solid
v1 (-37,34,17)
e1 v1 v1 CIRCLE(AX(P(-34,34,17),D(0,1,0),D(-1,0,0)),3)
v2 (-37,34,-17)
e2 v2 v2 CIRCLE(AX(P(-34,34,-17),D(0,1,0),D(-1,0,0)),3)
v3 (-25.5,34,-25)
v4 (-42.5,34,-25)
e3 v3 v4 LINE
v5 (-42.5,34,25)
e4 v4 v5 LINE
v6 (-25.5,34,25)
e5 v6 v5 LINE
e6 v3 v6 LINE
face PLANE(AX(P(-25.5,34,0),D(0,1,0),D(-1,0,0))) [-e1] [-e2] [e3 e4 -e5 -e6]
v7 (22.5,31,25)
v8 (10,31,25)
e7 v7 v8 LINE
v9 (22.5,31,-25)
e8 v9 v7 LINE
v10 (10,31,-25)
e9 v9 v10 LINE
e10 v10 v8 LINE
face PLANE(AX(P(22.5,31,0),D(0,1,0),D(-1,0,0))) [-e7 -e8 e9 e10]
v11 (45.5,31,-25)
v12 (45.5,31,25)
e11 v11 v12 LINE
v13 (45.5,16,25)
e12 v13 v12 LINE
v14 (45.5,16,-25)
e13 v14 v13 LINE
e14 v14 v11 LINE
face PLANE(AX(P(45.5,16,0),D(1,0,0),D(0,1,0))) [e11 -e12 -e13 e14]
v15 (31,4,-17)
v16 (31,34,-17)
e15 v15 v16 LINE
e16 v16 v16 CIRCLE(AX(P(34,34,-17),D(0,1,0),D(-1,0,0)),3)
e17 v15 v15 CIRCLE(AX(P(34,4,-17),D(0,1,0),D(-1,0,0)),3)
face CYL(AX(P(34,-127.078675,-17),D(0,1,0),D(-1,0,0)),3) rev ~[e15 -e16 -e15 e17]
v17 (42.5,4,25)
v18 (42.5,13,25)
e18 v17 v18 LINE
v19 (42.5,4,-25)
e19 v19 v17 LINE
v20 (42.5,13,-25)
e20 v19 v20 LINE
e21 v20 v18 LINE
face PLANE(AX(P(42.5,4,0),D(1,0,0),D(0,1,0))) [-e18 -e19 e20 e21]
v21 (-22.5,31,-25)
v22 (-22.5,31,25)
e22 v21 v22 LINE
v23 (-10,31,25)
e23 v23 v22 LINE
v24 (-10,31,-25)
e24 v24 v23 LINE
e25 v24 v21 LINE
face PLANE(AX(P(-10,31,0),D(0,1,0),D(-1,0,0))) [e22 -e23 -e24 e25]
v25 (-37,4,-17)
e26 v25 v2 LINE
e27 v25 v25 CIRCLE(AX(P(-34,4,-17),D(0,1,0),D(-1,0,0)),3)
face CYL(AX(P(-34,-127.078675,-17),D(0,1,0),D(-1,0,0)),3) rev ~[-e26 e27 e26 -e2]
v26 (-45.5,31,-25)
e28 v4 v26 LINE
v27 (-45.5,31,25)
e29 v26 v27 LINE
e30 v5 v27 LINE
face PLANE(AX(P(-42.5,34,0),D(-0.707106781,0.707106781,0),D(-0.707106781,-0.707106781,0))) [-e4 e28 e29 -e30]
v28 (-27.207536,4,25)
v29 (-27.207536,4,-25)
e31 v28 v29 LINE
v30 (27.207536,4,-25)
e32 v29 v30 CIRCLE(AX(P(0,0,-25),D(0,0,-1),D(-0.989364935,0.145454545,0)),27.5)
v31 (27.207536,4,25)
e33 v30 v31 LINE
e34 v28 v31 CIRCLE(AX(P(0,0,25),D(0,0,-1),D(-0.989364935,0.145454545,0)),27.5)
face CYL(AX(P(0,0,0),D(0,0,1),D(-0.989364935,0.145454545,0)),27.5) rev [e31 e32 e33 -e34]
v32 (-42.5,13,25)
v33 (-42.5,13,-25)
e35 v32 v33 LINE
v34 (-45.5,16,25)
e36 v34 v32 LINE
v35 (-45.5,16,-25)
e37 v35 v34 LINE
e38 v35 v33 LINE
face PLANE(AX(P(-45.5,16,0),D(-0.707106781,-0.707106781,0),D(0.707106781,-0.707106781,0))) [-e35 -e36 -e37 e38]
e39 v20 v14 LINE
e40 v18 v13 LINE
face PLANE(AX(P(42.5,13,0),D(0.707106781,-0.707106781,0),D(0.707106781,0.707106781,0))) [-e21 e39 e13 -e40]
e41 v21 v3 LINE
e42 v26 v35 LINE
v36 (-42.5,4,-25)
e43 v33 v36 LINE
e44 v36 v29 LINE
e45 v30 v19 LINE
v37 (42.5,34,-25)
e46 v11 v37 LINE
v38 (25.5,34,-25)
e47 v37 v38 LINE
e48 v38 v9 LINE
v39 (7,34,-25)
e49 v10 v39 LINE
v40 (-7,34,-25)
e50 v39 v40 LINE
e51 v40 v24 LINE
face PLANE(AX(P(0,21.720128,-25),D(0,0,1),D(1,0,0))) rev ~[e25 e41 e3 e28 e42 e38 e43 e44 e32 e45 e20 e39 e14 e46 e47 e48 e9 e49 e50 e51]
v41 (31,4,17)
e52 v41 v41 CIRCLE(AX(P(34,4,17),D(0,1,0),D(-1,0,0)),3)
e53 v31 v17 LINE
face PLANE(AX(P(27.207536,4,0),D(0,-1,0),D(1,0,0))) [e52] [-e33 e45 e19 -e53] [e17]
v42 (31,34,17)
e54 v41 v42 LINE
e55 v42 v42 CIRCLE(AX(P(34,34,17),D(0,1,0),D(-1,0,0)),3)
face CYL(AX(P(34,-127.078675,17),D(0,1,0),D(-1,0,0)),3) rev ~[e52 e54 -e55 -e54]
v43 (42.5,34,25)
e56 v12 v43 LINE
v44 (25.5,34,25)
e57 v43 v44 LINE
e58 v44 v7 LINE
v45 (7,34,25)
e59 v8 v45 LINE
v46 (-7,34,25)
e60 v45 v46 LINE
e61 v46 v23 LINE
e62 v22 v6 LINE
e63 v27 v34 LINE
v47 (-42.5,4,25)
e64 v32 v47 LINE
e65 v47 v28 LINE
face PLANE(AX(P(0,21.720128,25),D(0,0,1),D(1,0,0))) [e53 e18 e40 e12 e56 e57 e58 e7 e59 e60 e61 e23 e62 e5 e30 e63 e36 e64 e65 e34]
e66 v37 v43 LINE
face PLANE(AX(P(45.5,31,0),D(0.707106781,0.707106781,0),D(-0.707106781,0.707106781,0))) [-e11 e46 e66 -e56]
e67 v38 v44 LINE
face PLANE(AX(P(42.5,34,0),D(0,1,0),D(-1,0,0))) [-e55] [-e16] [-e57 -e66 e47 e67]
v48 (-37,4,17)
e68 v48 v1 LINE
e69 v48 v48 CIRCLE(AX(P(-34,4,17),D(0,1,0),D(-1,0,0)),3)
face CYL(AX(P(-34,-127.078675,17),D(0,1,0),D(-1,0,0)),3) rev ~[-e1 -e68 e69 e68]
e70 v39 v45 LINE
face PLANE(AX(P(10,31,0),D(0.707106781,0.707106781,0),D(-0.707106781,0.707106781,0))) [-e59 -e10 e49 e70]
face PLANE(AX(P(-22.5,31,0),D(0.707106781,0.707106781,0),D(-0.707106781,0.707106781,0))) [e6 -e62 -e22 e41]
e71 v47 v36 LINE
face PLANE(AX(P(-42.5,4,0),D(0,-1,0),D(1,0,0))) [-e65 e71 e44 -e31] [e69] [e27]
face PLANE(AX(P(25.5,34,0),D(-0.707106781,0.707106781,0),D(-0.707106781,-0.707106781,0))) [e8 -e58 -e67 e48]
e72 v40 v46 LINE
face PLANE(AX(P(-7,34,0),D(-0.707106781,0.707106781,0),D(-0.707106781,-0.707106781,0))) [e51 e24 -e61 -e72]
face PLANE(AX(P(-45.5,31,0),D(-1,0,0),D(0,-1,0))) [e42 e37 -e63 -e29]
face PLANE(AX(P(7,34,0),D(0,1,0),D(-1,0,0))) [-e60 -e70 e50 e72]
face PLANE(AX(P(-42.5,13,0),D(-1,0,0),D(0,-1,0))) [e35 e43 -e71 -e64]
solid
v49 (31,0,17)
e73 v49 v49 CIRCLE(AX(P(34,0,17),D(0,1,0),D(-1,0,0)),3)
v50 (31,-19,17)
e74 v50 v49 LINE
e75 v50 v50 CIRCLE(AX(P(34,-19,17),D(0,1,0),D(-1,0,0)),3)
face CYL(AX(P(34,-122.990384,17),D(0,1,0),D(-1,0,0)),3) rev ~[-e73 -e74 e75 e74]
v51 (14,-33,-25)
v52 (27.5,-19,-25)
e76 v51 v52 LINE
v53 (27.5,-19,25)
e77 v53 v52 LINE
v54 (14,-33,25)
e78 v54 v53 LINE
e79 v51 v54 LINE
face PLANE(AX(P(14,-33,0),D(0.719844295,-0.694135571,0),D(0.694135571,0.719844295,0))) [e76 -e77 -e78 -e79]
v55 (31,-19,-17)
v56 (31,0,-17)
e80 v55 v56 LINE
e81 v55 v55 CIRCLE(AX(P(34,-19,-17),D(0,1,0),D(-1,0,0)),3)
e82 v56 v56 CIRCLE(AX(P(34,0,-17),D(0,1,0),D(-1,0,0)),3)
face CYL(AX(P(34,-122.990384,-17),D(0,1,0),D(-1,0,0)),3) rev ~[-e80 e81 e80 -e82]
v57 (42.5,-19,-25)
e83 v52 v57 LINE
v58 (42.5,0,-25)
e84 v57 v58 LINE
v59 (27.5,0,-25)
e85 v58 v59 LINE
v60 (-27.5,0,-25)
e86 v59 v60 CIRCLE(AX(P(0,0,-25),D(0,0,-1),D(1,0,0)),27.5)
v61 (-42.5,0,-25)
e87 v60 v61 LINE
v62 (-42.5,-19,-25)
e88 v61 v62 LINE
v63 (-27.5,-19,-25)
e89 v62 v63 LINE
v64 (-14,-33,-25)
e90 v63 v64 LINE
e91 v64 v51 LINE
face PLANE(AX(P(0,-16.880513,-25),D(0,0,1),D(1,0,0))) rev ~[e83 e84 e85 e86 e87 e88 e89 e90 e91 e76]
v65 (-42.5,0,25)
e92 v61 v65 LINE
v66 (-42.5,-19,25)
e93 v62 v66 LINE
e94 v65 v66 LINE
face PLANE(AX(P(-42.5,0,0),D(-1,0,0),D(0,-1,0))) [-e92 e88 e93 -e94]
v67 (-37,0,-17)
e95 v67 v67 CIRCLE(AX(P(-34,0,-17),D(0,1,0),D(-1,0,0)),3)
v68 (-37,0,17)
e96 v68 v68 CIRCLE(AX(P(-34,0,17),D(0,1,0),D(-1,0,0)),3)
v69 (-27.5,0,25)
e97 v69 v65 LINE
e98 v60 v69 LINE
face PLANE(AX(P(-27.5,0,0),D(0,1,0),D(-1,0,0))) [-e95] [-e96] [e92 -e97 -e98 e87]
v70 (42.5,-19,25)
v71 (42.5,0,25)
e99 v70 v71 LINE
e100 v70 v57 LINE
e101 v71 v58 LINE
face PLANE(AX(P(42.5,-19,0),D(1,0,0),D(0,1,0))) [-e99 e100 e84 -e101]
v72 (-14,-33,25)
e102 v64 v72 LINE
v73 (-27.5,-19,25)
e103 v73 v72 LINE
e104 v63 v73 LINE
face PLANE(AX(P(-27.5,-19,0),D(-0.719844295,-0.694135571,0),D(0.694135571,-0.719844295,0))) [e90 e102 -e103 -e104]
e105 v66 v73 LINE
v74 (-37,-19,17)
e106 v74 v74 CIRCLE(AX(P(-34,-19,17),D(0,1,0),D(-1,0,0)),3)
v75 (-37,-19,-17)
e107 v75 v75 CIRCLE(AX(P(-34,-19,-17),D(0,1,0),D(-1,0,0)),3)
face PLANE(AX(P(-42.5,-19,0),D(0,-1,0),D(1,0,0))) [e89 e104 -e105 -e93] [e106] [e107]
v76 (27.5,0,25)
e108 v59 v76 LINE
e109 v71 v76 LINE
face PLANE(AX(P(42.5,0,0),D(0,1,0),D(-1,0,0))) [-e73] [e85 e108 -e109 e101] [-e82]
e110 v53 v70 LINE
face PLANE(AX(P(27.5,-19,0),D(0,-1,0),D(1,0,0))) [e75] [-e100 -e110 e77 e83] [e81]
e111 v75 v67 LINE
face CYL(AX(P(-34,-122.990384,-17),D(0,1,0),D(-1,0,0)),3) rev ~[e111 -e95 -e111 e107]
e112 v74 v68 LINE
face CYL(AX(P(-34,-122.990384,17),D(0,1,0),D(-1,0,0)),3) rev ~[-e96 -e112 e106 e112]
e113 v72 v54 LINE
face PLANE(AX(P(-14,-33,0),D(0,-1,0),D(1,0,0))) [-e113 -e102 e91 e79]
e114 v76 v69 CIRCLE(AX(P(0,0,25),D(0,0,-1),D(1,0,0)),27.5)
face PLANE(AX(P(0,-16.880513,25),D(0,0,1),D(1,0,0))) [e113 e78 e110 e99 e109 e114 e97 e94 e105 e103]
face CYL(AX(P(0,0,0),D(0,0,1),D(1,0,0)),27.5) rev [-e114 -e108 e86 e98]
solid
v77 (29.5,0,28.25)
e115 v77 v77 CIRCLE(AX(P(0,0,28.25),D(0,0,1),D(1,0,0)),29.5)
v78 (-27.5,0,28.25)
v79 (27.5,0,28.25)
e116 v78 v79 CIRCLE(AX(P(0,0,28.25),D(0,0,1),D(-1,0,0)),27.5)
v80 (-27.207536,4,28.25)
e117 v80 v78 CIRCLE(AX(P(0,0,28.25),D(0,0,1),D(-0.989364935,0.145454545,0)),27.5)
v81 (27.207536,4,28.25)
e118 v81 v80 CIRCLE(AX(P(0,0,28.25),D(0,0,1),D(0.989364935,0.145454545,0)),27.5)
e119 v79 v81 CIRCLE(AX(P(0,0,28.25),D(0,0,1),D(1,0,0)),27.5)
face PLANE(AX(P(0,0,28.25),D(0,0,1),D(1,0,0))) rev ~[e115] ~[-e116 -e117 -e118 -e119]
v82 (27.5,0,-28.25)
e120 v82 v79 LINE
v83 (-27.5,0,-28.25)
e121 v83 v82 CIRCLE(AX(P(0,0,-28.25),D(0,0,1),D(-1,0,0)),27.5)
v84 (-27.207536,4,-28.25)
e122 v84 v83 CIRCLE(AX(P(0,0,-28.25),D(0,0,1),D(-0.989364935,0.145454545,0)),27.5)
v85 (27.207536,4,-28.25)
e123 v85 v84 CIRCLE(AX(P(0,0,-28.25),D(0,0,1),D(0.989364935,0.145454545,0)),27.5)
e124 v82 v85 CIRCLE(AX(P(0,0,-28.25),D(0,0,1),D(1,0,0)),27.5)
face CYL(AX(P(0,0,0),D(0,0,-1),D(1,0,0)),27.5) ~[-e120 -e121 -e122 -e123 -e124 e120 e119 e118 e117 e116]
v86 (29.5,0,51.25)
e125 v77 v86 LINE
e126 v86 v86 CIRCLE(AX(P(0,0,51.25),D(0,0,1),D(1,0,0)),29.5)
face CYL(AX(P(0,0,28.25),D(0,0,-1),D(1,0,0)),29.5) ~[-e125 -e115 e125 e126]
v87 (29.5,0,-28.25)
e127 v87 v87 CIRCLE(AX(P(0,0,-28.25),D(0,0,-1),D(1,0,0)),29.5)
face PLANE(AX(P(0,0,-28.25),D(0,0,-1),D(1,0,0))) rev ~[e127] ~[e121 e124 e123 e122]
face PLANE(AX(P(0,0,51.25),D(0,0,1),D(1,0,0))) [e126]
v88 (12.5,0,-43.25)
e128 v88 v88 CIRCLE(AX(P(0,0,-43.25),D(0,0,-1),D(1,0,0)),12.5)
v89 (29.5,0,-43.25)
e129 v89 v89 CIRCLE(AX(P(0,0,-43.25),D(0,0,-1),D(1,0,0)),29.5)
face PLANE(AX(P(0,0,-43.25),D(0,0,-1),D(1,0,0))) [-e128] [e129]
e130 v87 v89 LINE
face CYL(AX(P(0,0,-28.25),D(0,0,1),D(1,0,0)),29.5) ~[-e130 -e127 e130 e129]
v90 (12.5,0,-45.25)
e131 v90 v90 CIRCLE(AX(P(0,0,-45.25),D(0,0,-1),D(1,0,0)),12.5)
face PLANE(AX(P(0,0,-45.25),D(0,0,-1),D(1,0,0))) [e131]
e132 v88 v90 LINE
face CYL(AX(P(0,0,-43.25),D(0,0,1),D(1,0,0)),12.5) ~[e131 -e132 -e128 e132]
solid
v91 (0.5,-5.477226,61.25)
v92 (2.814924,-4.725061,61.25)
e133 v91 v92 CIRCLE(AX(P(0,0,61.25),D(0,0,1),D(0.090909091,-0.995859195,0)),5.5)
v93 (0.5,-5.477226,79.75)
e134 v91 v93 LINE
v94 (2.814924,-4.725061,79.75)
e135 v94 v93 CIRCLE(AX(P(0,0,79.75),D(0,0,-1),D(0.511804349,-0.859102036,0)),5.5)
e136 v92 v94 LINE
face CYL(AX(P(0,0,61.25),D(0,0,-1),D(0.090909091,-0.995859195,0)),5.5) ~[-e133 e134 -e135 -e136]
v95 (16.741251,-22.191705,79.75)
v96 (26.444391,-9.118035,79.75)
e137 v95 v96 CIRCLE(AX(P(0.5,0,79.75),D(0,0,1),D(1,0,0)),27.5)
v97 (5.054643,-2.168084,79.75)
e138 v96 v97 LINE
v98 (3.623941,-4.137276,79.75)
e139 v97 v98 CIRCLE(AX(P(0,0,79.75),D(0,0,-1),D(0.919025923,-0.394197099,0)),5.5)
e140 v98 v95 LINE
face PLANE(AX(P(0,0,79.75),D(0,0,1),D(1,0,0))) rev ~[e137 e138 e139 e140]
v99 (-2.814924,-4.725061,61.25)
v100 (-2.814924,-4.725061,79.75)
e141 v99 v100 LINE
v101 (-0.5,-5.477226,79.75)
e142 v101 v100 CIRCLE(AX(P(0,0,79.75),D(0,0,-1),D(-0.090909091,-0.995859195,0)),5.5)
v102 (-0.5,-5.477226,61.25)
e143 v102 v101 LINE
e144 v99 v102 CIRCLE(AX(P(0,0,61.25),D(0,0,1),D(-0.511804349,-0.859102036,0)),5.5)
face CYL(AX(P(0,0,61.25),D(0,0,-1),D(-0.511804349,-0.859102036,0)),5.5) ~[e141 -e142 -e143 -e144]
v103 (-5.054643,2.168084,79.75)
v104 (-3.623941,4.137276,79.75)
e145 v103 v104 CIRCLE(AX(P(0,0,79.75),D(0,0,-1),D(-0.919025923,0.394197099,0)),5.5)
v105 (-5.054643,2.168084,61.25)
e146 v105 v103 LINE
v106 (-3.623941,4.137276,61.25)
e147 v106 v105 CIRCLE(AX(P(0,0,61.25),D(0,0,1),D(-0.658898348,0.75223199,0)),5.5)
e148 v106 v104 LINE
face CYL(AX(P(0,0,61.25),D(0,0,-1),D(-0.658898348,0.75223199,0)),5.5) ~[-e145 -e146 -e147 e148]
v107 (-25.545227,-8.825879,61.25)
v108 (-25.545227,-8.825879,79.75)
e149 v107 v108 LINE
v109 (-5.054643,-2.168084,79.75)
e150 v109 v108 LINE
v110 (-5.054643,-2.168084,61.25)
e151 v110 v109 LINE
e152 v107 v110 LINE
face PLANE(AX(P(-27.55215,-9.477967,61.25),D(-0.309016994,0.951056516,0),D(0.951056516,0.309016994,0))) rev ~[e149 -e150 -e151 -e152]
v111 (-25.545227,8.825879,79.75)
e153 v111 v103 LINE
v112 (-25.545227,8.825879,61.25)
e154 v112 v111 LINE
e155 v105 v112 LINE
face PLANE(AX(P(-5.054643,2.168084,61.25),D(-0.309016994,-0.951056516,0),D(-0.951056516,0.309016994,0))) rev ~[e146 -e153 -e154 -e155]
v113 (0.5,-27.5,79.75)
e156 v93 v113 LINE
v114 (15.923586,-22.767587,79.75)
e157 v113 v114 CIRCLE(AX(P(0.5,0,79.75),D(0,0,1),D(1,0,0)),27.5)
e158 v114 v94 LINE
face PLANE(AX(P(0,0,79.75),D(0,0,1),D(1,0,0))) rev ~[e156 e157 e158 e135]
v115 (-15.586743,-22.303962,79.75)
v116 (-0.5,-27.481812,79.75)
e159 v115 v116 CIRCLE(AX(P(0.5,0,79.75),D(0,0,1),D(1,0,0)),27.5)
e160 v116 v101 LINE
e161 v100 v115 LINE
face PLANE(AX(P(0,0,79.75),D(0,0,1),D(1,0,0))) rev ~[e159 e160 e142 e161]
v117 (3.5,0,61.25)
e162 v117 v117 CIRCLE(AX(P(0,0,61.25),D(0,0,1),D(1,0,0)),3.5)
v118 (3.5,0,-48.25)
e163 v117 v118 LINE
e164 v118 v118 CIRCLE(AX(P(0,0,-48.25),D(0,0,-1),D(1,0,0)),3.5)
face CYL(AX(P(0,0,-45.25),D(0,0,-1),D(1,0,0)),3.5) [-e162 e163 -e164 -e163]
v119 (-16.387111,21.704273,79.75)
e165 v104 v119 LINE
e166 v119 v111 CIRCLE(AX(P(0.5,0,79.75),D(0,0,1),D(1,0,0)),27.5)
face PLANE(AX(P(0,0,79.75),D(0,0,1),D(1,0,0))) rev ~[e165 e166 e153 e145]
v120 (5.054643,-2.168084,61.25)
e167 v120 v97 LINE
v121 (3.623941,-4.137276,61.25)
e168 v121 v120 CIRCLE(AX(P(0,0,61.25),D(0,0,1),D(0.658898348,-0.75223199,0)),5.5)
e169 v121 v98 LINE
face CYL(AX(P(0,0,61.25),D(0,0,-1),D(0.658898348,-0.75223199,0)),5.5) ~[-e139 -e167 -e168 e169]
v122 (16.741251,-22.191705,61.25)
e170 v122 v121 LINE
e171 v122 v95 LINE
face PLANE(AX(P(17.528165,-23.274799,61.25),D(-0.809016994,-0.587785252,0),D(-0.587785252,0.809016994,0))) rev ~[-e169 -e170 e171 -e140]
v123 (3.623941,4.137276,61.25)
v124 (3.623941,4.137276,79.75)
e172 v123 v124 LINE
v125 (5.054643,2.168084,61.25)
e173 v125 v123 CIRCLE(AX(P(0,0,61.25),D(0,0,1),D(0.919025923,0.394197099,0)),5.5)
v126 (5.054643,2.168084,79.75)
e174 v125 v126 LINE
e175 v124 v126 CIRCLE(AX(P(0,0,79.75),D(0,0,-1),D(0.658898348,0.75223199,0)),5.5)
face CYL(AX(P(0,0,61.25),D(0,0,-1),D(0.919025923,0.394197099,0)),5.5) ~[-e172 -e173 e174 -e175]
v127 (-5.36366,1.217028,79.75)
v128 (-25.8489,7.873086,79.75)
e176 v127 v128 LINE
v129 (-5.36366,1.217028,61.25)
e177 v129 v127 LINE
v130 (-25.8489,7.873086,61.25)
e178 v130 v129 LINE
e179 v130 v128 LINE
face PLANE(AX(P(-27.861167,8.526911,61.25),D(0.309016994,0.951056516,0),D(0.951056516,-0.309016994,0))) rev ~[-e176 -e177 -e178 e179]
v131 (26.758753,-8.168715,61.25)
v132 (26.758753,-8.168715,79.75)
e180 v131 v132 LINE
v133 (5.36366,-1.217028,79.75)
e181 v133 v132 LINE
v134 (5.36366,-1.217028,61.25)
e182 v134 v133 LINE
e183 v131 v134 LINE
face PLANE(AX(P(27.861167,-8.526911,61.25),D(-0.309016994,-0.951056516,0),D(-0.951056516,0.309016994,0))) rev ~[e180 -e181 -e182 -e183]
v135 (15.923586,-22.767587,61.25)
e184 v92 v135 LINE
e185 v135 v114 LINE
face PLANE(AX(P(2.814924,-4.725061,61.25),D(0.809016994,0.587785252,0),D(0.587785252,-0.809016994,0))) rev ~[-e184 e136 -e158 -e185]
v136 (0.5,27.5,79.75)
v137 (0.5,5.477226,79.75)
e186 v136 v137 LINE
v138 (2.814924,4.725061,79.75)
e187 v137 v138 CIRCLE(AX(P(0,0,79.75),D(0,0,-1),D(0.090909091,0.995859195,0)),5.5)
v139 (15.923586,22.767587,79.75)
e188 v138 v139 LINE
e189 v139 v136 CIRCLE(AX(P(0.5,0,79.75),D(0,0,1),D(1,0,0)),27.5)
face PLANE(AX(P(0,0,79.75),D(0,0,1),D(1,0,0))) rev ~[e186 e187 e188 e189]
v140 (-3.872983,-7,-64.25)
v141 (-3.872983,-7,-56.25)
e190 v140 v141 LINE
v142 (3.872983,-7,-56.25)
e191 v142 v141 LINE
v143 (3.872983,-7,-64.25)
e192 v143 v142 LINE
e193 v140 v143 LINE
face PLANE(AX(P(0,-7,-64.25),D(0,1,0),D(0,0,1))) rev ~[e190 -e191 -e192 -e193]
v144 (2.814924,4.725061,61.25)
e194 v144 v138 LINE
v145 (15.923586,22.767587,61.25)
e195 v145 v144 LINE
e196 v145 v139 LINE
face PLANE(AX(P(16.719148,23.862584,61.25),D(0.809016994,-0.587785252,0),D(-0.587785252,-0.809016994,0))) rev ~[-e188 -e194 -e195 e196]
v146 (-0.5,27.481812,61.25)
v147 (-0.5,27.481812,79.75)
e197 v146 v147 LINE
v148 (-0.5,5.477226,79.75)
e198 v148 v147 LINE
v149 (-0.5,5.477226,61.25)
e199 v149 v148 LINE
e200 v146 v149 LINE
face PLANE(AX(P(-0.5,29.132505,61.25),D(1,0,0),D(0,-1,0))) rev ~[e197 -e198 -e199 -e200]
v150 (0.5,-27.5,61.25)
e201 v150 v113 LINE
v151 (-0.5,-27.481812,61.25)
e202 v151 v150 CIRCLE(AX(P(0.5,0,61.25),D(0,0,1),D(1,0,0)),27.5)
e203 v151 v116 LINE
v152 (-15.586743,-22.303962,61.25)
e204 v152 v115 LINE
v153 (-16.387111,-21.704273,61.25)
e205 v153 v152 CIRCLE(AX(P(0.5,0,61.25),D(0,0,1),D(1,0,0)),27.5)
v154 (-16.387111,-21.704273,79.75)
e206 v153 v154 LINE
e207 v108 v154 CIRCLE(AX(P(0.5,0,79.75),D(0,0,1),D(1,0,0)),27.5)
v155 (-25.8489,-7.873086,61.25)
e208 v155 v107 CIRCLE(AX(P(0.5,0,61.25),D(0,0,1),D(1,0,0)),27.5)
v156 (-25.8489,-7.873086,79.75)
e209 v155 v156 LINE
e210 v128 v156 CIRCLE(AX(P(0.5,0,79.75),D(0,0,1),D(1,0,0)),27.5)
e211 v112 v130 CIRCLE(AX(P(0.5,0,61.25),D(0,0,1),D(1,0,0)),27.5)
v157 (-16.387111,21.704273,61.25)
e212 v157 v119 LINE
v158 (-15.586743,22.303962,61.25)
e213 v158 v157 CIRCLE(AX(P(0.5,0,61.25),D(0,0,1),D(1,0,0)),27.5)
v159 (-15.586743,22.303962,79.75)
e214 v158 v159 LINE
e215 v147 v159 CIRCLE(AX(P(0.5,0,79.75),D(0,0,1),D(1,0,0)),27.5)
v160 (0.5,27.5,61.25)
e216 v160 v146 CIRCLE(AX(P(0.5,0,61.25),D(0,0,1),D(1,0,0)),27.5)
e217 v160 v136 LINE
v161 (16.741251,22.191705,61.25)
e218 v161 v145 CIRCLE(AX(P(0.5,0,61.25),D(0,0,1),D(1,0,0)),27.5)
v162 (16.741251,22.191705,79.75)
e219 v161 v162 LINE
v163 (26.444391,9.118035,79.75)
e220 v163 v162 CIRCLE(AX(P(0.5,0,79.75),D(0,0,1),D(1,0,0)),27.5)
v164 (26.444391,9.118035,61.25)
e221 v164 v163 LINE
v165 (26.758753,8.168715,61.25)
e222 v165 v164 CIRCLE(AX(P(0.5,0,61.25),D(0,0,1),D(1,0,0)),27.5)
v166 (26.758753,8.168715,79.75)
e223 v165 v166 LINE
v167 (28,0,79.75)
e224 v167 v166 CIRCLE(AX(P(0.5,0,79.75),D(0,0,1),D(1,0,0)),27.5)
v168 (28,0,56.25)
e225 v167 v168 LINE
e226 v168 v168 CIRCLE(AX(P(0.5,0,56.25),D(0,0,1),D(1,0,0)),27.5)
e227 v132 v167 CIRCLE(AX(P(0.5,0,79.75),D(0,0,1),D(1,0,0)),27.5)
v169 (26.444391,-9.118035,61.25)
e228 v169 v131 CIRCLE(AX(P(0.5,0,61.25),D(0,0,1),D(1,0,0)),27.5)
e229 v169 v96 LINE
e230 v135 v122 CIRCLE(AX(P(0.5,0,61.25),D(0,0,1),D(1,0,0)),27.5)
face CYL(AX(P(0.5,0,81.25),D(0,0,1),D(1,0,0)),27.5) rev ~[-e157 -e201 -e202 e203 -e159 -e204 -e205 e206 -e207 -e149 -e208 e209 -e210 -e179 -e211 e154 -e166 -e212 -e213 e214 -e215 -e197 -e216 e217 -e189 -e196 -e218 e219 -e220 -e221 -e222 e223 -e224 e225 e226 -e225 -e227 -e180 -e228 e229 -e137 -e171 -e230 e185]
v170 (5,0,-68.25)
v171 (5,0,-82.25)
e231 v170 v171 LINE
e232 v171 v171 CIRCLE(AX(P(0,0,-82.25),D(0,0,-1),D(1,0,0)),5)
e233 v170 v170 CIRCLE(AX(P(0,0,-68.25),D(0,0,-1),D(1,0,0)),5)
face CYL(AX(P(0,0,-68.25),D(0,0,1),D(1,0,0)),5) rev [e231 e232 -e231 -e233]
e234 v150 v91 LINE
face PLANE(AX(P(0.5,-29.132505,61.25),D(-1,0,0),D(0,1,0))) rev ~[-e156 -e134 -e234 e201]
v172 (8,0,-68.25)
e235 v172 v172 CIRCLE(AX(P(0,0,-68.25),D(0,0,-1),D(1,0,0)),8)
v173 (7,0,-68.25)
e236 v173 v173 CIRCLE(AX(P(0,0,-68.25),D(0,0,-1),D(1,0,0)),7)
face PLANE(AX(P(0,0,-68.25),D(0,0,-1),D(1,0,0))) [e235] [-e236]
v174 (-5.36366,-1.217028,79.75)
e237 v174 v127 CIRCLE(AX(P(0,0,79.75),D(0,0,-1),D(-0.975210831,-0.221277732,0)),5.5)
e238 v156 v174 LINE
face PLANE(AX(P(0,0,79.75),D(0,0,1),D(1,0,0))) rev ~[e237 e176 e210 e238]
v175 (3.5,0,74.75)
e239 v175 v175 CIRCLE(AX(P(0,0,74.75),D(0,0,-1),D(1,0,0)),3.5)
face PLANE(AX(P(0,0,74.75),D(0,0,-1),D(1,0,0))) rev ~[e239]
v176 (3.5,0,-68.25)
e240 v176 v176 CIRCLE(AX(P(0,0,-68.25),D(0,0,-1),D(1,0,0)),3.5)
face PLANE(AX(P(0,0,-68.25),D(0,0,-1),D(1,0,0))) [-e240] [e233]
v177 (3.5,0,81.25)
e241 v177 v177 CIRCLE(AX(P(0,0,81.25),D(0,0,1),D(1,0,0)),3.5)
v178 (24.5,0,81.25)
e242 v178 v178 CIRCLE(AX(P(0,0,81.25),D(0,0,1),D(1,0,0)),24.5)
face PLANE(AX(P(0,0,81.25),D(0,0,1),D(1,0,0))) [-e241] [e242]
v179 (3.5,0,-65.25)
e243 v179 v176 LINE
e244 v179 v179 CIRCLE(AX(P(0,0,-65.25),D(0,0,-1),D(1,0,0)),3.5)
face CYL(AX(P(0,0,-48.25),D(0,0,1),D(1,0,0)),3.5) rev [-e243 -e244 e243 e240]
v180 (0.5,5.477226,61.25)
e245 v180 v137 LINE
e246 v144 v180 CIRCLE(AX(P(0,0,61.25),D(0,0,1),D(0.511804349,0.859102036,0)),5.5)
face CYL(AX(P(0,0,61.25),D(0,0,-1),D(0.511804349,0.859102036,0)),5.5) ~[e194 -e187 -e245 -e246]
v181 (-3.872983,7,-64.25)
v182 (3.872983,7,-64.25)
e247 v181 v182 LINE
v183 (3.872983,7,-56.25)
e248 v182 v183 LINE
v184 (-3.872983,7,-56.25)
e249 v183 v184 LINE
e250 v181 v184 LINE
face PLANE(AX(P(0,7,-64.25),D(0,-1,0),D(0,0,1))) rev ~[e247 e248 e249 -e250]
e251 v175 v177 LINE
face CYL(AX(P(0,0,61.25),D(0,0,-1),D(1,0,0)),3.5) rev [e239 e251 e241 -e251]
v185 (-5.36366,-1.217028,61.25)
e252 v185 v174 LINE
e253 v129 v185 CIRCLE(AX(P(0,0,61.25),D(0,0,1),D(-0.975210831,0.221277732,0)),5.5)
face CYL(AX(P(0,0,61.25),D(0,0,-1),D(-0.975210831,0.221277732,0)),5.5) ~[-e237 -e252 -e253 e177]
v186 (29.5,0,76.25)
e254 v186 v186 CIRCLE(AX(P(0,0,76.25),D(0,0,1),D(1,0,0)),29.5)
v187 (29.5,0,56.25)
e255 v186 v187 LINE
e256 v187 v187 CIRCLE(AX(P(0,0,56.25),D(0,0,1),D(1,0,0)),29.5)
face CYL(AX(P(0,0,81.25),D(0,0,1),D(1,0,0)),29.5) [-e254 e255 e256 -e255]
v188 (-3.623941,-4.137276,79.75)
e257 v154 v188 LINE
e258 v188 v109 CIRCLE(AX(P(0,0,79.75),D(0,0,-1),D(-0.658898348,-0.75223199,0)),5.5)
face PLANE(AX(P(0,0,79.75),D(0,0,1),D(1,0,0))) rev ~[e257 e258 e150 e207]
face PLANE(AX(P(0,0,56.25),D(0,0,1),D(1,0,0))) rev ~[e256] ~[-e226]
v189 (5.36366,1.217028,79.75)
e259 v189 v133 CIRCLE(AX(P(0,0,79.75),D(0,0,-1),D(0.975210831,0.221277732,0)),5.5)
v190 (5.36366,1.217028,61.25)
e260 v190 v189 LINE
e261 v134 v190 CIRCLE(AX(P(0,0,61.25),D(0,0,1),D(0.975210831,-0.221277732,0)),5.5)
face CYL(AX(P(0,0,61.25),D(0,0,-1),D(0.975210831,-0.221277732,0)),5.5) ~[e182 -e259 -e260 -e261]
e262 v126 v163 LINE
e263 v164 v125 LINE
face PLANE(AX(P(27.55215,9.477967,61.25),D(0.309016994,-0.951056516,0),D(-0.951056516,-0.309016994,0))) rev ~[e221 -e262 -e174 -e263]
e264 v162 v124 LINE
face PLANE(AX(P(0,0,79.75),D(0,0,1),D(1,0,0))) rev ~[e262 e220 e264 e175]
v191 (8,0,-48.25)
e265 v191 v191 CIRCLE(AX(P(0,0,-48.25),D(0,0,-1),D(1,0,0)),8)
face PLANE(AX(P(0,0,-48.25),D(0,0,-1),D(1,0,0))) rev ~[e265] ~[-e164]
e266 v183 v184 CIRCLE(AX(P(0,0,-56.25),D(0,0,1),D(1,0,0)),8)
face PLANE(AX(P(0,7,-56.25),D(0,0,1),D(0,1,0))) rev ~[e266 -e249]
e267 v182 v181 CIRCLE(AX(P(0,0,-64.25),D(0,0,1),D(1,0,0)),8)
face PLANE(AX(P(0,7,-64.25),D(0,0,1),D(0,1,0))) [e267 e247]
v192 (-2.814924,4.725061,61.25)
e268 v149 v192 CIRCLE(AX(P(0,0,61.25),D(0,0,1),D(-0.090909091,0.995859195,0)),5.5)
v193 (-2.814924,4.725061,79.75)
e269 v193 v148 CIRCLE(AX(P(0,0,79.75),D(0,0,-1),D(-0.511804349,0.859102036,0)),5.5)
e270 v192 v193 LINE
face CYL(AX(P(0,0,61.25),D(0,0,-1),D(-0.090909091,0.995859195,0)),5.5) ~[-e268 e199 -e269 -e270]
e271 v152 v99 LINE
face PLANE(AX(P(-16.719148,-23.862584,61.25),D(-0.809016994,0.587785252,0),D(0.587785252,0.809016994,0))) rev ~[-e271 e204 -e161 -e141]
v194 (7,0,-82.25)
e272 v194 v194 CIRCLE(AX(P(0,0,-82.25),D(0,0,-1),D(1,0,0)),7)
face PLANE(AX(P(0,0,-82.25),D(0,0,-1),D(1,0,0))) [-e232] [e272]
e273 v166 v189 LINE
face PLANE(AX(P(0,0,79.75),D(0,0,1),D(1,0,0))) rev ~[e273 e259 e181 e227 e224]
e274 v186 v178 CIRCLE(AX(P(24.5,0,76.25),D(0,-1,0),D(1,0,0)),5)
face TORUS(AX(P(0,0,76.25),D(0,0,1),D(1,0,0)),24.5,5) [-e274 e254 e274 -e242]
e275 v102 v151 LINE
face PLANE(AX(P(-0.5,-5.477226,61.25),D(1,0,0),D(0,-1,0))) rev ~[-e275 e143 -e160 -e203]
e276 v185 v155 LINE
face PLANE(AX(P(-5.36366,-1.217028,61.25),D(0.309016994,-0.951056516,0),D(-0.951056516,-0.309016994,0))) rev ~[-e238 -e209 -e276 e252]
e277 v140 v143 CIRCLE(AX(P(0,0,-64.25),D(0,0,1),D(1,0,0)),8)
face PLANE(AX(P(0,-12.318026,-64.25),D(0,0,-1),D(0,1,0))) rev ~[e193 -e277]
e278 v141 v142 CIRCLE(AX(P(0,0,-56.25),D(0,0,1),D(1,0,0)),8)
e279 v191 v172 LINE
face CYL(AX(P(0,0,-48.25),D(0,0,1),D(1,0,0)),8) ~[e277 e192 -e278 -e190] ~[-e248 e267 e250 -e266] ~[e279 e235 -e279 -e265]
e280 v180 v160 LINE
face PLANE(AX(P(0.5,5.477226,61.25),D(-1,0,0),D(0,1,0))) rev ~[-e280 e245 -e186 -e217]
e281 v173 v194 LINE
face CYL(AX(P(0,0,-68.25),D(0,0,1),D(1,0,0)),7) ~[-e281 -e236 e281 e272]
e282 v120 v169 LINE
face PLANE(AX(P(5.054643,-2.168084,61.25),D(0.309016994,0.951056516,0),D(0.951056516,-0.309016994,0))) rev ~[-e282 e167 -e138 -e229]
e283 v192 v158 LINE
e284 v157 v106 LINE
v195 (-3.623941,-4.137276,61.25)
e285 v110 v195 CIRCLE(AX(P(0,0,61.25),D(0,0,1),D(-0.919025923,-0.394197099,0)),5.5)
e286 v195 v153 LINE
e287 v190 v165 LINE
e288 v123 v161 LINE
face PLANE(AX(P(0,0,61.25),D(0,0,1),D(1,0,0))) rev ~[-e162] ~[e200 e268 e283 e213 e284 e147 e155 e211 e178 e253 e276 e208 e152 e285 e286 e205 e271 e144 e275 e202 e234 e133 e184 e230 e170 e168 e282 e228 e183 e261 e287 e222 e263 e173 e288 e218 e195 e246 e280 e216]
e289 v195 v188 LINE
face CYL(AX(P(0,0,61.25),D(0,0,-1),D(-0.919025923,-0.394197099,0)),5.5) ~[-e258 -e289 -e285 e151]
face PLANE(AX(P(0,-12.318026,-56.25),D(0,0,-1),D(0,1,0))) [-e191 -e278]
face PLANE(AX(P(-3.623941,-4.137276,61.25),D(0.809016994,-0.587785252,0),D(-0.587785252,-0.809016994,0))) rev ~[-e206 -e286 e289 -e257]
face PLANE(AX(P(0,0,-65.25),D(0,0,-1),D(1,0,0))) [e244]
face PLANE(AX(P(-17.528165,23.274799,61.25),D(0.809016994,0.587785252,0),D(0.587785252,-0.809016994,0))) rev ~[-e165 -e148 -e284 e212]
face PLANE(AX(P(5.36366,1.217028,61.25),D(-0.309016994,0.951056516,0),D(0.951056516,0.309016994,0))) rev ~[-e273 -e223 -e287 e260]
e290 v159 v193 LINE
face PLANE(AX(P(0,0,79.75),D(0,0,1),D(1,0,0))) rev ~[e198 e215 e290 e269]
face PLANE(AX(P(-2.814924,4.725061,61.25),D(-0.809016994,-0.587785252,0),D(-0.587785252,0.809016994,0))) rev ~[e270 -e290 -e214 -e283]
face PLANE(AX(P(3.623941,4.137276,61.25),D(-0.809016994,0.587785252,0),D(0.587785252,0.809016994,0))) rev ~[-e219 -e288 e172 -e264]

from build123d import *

# Parameters (mm, degrees)
F1_DEPTH      = 28.25
F2_R          = 29.5
F3_DEPTH      = 23
F4_R          = 29.5
F5_DEPTH      = 15
F6_R          = 12.5
F7_DEPTH      = 2
F8_R          = 3.5
F9_DEPTH      = 20
F9_DEPTH_BACK = 120
F11_R         = 8
F11_R_2       = 3.5
F12_DEPTH     = 20
F13_W         = 5.3180262744
F13_H         = 8
F14_DEPTH     = 5
F15_R         = 7
F15_R_2       = 5
F16_DEPTH     = 14
F18_R         = 3.5
F19_DEPTH     = 20
F20_R         = 29.5
F21_DEPTH     = 1.5
F22_R         = 29.5
F22_R_2       = 27.5
F23_DEPTH     = 25
F24_R         = 5
F25_DEPTH     = 25
F27_D         = 6
F27_2_D       = 6


with BuildPart() as f1:
    # F0 (on Top) → F1 (new body, symmetric)
    with BuildSketch(Plane.XY):
        with BuildLine():
            ThreePointArc((-27.5, 0), (0, -27.5), (27.5, 0))
            ThreePointArc((27.5, 0), (27.4267864716, 2.0053388339), (27.2075357208, 4))
            ThreePointArc((27.2075357208, 4), (0, 27.5), (-27.2075357208, 4))
            ThreePointArc((-27.2075357208, 4), (-27.4267864716, 2.0053388339), (-27.5, 0))
        make_face()
    extrude(amount=F1_DEPTH, both=True)

    # F2 (on face) → F3 (join)
    with BuildSketch(Plane.XY.offset(28.25)):
        Circle(F2_R)
        with BuildLine():
            ThreePointArc((-27.5, 0), (-27.4267864716, 2.0053388339), (-27.2075357208, 4))
            ThreePointArc((-27.2075357208, 4), (0, 27.5), (27.2075357208, 4))
            ThreePointArc((27.2075357208, 4), (27.4267864716, 2.0053388339), (27.5, 0))
            ThreePointArc((27.5, 0), (0, -27.5), (-27.5, 0))
        make_face(mode=Mode.SUBTRACT)
        with BuildLine():
            ThreePointArc((27.2075357208, 4), (0, 27.5), (-27.2075357208, 4))
            ThreePointArc((-27.2075357208, 4), (-27.4267864716, 2.0053388339), (-27.5, 0))
            ThreePointArc((-27.5, 0), (0, -27.5), (27.5, 0))
            ThreePointArc((27.5, 0), (27.4267864716, 2.0053388339), (27.2075357208, 4))
        make_face()
    extrude(amount=F3_DEPTH)

    # F4 (on face) → F5 (join)
    with BuildSketch(Plane(origin=(0, 0, -28.25), x_dir=(1, 0, 0), z_dir=(0, 0, -1))):
        Circle(F4_R)
        with BuildLine():
            ThreePointArc((-27.2075357208, -4), (-27.4267864716, -2.0053388339), (-27.5, 0))
            ThreePointArc((-27.5, 0), (0, 27.5), (27.5, 0))
            ThreePointArc((27.5, 0), (27.4267864716, -2.0053388339), (27.2075357208, -4))
            ThreePointArc((27.2075357208, -4), (0, -27.5), (-27.2075357208, -4))
        make_face(mode=Mode.SUBTRACT)
        with BuildLine():
            ThreePointArc((27.5, 0), (0, 27.5), (-27.5, 0))
            ThreePointArc((-27.5, 0), (-27.4267864716, -2.0053388339), (-27.2075357208, -4))
            ThreePointArc((-27.2075357208, -4), (0, -27.5), (27.2075357208, -4))
            ThreePointArc((27.2075357208, -4), (27.4267864716, -2.0053388339), (27.5, 0))
        make_face()
    extrude(amount=F5_DEPTH)

    # F6 (on face) → F7 (join)
    with BuildSketch(Plane(origin=(0, 0, -43.25), x_dir=(1, 0, 0), z_dir=(0, 0, -1))):
        Circle(F6_R)
    extrude(amount=F7_DEPTH)


with BuildPart() as f9:
    # F8 (on face) → F9 (new body, two sides)
    with BuildSketch(Plane(origin=(0, 0, -45.25), x_dir=(1, 0, 0), z_dir=(0, 0, -1))) as f9_sk:
        Circle(F8_R)
    extrude(amount=F9_DEPTH)
    extrude(f9_sk.sketch, amount=-F9_DEPTH_BACK)

    # F11 (on offset) → F12 (join)
    with BuildSketch(Plane(origin=(0, 0, -48.25), x_dir=(1, 0, 0), z_dir=(0, 0, -1))):
        Circle(F11_R)
        Circle(F11_R_2, mode=Mode.SUBTRACT)
    extrude(amount=F12_DEPTH)

    # F13 (on Right) → F14 (cut, symmetric)
    with BuildSketch(Plane.YZ):
        with Locations((9.6590131372, -60.25)):
            Rectangle(F13_W, F13_H)
        with Locations((-9.6590131372, -60.25)):
            Rectangle(F13_W, F13_H)
    extrude(amount=F14_DEPTH, both=True, mode=Mode.SUBTRACT)

    # F15 (on face) → F16 (join)
    with BuildSketch(Plane(origin=(0, 0, -68.25), x_dir=(1, 0, 0), z_dir=(0, 0, -1))):
        Circle(F15_R)
        Circle(F15_R_2, mode=Mode.SUBTRACT)
    extrude(amount=F16_DEPTH)

    # F18 (on offset) → F19 (join)
    with BuildSketch(Plane.XY.offset(61.25)):
        with BuildLine():
            Line((-0.5, -5.4772255751), (-0.5, -29.1325048873))
            Line((-0.5, -29.1325048873), (0.5, -29.1325048873))
            Line((0.5, -29.1325048873), (0.5, -5.4772255751))
            ThreePointArc((0.5, -5.4772255751), (1.6995934691, -5.2308108396), (2.8149239193, -4.7250611984))
            Line((2.8149239193, -4.7250611984), (16.7191482379, -23.8625841687))
            Line((16.7191482379, -23.8625841687), (17.5281652323, -23.2747989164))
            Line((17.5281652323, -23.2747989164), (3.6239409137, -4.1372759461))
            ThreePointArc((3.6239409137, -4.1372759461), (4.4495934691, -3.2328188876), (5.0546425772, -2.1680840429))
            Line((5.0546425772, -2.1680840429), (27.5521501119, -9.477967357))
            Line((27.5521501119, -9.477967357), (27.8611671063, -8.5269108407))
            Line((27.8611671063, -8.5269108407), (5.3636595716, -1.2170275266))
            ThreePointArc((5.3636595716, -1.2170275266), (5.5, 0), (5.3636595716, 1.2170275266))
            Line((5.3636595716, 1.2170275266), (27.8611671063, 8.5269108407))
            Line((27.8611671063, 8.5269108407), (27.5521501119, 9.477967357))
            Line((27.5521501119, 9.477967357), (5.0546425772, 2.1680840429))
            ThreePointArc((5.0546425772, 2.1680840429), (4.4495934691, 3.2328188876), (3.6239409137, 4.1372759461))
            Line((3.6239409137, 4.1372759461), (17.5281652323, 23.2747989164))
            Line((17.5281652323, 23.2747989164), (16.7191482379, 23.8625841687))
            Line((16.7191482379, 23.8625841687), (2.8149239193, 4.7250611984))
            ThreePointArc((2.8149239193, 4.7250611984), (1.6995934691, 5.2308108396), (0.5, 5.4772255751))
            Line((0.5, 5.4772255751), (0.5, 29.1325048873))
            Line((0.5, 29.1325048873), (-0.5, 29.1325048873))
            Line((-0.5, 29.1325048873), (-0.5, 5.4772255751))
            ThreePointArc((-0.5, 5.4772255751), (-1.6995934691, 5.2308108396), (-2.8149239193, 4.7250611984))
            Line((-2.8149239193, 4.7250611984), (-16.7191482379, 23.8625841687))
            Line((-16.7191482379, 23.8625841687), (-17.5281652323, 23.2747989164))
            Line((-17.5281652323, 23.2747989164), (-3.6239409137, 4.1372759461))
            ThreePointArc((-3.6239409137, 4.1372759461), (-4.4495934691, 3.2328188876), (-5.0546425772, 2.1680840429))
            Line((-5.0546425772, 2.1680840429), (-27.5521501119, 9.477967357))
            Line((-27.5521501119, 9.477967357), (-27.8611671063, 8.5269108407))
            Line((-27.8611671063, 8.5269108407), (-5.3636595716, 1.2170275266))
            ThreePointArc((-5.3636595716, 1.2170275266), (-5.5, 0), (-5.3636595716, -1.2170275266))
            Line((-5.3636595716, -1.2170275266), (-27.8611671063, -8.5269108407))
            Line((-27.8611671063, -8.5269108407), (-27.5521501119, -9.477967357))
            Line((-27.5521501119, -9.477967357), (-5.0546425772, -2.1680840429))
            ThreePointArc((-5.0546425772, -2.1680840429), (-4.4495934691, -3.2328188876), (-3.6239409137, -4.1372759461))
            Line((-3.6239409137, -4.1372759461), (-17.5281652323, -23.2747989164))
            Line((-17.5281652323, -23.2747989164), (-16.7191482379, -23.8625841687))
            Line((-16.7191482379, -23.8625841687), (-2.8149239193, -4.7250611984))
            ThreePointArc((-2.8149239193, -4.7250611984), (-1.6995934691, -5.2308108396), (-0.5, -5.4772255751))
        make_face()
        Circle(F18_R, mode=Mode.SUBTRACT)
    extrude(amount=F19_DEPTH)

    # F20 (on face) → F21 (join)
    with BuildSketch(Plane.XY.offset(81.25)):
        Circle(F20_R)
        with BuildLine():
            ThreePointArc((-0.5, -5.4772255751), (-1.6995934691, -5.2308108396), (-2.8149239193, -4.7250611984))
            Line((-2.8149239193, -4.7250611984), (-16.7191482379, -23.8625841687))
            Line((-16.7191482379, -23.8625841687), (-17.5281652323, -23.2747989164))
            Line((-17.5281652323, -23.2747989164), (-3.6239409137, -4.1372759461))
            ThreePointArc((-3.6239409137, -4.1372759461), (-4.4495934691, -3.2328188876), (-5.0546425772, -2.1680840429))
            Line((-5.0546425772, -2.1680840429), (-27.5521501119, -9.477967357))
            Line((-27.5521501119, -9.477967357), (-27.8611671063, -8.5269108407))
            Line((-27.8611671063, -8.5269108407), (-5.3636595716, -1.2170275266))
            ThreePointArc((-5.3636595716, -1.2170275266), (-5.5, 0), (-5.3636595716, 1.2170275266))
            Line((-5.3636595716, 1.2170275266), (-27.8611671063, 8.5269108407))
            Line((-27.8611671063, 8.5269108407), (-27.5521501119, 9.477967357))
            Line((-27.5521501119, 9.477967357), (-5.0546425772, 2.1680840429))
            ThreePointArc((-5.0546425772, 2.1680840429), (-4.4495934691, 3.2328188876), (-3.6239409137, 4.1372759461))
            Line((-3.6239409137, 4.1372759461), (-17.5281652323, 23.2747989164))
            Line((-17.5281652323, 23.2747989164), (-16.7191482379, 23.8625841687))
            Line((-16.7191482379, 23.8625841687), (-2.8149239193, 4.7250611984))
            ThreePointArc((-2.8149239193, 4.7250611984), (-1.6995934691, 5.2308108396), (-0.5, 5.4772255751))
            Line((-0.5, 5.4772255751), (-0.5, 29.1325048873))
            Line((-0.5, 29.1325048873), (0.5, 29.1325048873))
            Line((0.5, 29.1325048873), (0.5, 5.4772255751))
            ThreePointArc((0.5, 5.4772255751), (1.6995934691, 5.2308108396), (2.8149239193, 4.7250611984))
            Line((2.8149239193, 4.7250611984), (16.7191482379, 23.8625841687))
            Line((16.7191482379, 23.8625841687), (17.5281652323, 23.2747989164))
            Line((17.5281652323, 23.2747989164), (3.6239409137, 4.1372759461))
            ThreePointArc((3.6239409137, 4.1372759461), (4.4495934691, 3.2328188876), (5.0546425772, 2.1680840429))
            Line((5.0546425772, 2.1680840429), (27.5521501119, 9.477967357))
            Line((27.5521501119, 9.477967357), (27.8611671063, 8.5269108407))
            Line((27.8611671063, 8.5269108407), (5.3636595716, 1.2170275266))
            ThreePointArc((5.3636595716, 1.2170275266), (5.5, 0), (5.3636595716, -1.2170275266))
            Line((5.3636595716, -1.2170275266), (27.8611671063, -8.5269108407))
            Line((27.8611671063, -8.5269108407), (27.5521501119, -9.477967357))
            Line((27.5521501119, -9.477967357), (5.0546425772, -2.1680840429))
            ThreePointArc((5.0546425772, -2.1680840429), (4.4495934691, -3.2328188876), (3.6239409137, -4.1372759461))
            Line((3.6239409137, -4.1372759461), (17.5281652323, -23.2747989164))
            Line((17.5281652323, -23.2747989164), (16.7191482379, -23.8625841687))
            Line((16.7191482379, -23.8625841687), (2.8149239193, -4.7250611984))
            ThreePointArc((2.8149239193, -4.7250611984), (1.6995934691, -5.2308108396), (0.5, -5.4772255751))
            Line((0.5, -5.4772255751), (0.5, -29.1325048873))
            Line((0.5, -29.1325048873), (-0.5, -29.1325048873))
            Line((-0.5, -29.1325048873), (-0.5, -5.4772255751))
        make_face(mode=Mode.SUBTRACT)
    extrude(amount=-F21_DEPTH)

    # F22 (on face) → F23 (join)
    with BuildSketch(Plane.XY.offset(81.25)):
        Circle(F22_R)
        with Locations((0.5, 0)):
            Circle(F22_R_2, mode=Mode.SUBTRACT)
    extrude(amount=-F23_DEPTH)

    # F24
    f24_edges = [f9.edges().sort_by_distance(p)[0] for p in [
        (-29.5, 0, 81.25),
    ]]
    fillet(f24_edges, radius=F24_R)


with BuildPart() as f25:
    # F0 (on Top) → F25 (new body, symmetric)
    with BuildSketch(Plane.XY):
        with BuildLine():
            Line((42.5, 0), (27.5, 0))
            ThreePointArc((27.5, 0), (0, -27.5), (-27.5, 0))
            Line((-27.5, 0), (-42.5, 0))
            Line((-42.5, 0), (-42.5, -19))
            Line((-42.5, -19), (-27.5, -19))
            Line((-27.5, -19), (-14, -33))
            Line((-14, -33), (0, -33))
            Line((0, -33), (14, -33))
            Line((14, -33), (27.5, -19))
            Line((27.5, -19), (42.5, -19))
            Line((42.5, -19), (42.5, 0))
        make_face()
    extrude(amount=F25_DEPTH, both=True)

    # F27 (through all)
    with Locations(Plane.XZ.offset(19)):
        with Locations((-34, 17), (-34, -17), (34, 17), (34, -17)):
            Hole(F27_D / 2)


with BuildPart() as f25b:
    # F0 (on Top) → F25, piece 2 (new body, symmetric)
    with BuildSketch(Plane.XY):
        with BuildLine():
            ThreePointArc((-27.2075357208, 4), (0, 27.5), (27.2075357208, 4))
            Line((27.2075357208, 4), (42.5, 4))
            Line((42.5, 4), (42.5, 13))
            Line((42.5, 13), (45.5, 16))
            Line((45.5, 16), (45.5, 31))
            Line((45.5, 31), (42.5, 34))
            Line((42.5, 34), (25.5, 34))
            Line((25.5, 34), (22.5, 31))
            Line((22.5, 31), (10, 31))
            Line((10, 31), (7, 34))
            Line((7, 34), (0, 34))
            Line((0, 34), (-7, 34))
            Line((-7, 34), (-10, 31))
            Line((-10, 31), (-22.5, 31))
            Line((-22.5, 31), (-25.5, 34))
            Line((-25.5, 34), (-42.5, 34))
            Line((-42.5, 34), (-45.5, 31))
            Line((-45.5, 31), (-45.5, 16))
            Line((-45.5, 16), (-42.5, 13))
            Line((-42.5, 13), (-42.5, 4))
            Line((-42.5, 4), (-27.2075357208, 4))
        make_face()
    extrude(amount=F25_DEPTH, both=True)

    # F27#2 (through all)
    with Locations(Plane.XZ.offset(19)):
        with Locations((-34, 17), (-34, -17), (34, 17), (34, -17)):
            Hole(F27_2_D / 2)


solid = Compound([f1.part, f9.part, f25.part, f25b.part])
